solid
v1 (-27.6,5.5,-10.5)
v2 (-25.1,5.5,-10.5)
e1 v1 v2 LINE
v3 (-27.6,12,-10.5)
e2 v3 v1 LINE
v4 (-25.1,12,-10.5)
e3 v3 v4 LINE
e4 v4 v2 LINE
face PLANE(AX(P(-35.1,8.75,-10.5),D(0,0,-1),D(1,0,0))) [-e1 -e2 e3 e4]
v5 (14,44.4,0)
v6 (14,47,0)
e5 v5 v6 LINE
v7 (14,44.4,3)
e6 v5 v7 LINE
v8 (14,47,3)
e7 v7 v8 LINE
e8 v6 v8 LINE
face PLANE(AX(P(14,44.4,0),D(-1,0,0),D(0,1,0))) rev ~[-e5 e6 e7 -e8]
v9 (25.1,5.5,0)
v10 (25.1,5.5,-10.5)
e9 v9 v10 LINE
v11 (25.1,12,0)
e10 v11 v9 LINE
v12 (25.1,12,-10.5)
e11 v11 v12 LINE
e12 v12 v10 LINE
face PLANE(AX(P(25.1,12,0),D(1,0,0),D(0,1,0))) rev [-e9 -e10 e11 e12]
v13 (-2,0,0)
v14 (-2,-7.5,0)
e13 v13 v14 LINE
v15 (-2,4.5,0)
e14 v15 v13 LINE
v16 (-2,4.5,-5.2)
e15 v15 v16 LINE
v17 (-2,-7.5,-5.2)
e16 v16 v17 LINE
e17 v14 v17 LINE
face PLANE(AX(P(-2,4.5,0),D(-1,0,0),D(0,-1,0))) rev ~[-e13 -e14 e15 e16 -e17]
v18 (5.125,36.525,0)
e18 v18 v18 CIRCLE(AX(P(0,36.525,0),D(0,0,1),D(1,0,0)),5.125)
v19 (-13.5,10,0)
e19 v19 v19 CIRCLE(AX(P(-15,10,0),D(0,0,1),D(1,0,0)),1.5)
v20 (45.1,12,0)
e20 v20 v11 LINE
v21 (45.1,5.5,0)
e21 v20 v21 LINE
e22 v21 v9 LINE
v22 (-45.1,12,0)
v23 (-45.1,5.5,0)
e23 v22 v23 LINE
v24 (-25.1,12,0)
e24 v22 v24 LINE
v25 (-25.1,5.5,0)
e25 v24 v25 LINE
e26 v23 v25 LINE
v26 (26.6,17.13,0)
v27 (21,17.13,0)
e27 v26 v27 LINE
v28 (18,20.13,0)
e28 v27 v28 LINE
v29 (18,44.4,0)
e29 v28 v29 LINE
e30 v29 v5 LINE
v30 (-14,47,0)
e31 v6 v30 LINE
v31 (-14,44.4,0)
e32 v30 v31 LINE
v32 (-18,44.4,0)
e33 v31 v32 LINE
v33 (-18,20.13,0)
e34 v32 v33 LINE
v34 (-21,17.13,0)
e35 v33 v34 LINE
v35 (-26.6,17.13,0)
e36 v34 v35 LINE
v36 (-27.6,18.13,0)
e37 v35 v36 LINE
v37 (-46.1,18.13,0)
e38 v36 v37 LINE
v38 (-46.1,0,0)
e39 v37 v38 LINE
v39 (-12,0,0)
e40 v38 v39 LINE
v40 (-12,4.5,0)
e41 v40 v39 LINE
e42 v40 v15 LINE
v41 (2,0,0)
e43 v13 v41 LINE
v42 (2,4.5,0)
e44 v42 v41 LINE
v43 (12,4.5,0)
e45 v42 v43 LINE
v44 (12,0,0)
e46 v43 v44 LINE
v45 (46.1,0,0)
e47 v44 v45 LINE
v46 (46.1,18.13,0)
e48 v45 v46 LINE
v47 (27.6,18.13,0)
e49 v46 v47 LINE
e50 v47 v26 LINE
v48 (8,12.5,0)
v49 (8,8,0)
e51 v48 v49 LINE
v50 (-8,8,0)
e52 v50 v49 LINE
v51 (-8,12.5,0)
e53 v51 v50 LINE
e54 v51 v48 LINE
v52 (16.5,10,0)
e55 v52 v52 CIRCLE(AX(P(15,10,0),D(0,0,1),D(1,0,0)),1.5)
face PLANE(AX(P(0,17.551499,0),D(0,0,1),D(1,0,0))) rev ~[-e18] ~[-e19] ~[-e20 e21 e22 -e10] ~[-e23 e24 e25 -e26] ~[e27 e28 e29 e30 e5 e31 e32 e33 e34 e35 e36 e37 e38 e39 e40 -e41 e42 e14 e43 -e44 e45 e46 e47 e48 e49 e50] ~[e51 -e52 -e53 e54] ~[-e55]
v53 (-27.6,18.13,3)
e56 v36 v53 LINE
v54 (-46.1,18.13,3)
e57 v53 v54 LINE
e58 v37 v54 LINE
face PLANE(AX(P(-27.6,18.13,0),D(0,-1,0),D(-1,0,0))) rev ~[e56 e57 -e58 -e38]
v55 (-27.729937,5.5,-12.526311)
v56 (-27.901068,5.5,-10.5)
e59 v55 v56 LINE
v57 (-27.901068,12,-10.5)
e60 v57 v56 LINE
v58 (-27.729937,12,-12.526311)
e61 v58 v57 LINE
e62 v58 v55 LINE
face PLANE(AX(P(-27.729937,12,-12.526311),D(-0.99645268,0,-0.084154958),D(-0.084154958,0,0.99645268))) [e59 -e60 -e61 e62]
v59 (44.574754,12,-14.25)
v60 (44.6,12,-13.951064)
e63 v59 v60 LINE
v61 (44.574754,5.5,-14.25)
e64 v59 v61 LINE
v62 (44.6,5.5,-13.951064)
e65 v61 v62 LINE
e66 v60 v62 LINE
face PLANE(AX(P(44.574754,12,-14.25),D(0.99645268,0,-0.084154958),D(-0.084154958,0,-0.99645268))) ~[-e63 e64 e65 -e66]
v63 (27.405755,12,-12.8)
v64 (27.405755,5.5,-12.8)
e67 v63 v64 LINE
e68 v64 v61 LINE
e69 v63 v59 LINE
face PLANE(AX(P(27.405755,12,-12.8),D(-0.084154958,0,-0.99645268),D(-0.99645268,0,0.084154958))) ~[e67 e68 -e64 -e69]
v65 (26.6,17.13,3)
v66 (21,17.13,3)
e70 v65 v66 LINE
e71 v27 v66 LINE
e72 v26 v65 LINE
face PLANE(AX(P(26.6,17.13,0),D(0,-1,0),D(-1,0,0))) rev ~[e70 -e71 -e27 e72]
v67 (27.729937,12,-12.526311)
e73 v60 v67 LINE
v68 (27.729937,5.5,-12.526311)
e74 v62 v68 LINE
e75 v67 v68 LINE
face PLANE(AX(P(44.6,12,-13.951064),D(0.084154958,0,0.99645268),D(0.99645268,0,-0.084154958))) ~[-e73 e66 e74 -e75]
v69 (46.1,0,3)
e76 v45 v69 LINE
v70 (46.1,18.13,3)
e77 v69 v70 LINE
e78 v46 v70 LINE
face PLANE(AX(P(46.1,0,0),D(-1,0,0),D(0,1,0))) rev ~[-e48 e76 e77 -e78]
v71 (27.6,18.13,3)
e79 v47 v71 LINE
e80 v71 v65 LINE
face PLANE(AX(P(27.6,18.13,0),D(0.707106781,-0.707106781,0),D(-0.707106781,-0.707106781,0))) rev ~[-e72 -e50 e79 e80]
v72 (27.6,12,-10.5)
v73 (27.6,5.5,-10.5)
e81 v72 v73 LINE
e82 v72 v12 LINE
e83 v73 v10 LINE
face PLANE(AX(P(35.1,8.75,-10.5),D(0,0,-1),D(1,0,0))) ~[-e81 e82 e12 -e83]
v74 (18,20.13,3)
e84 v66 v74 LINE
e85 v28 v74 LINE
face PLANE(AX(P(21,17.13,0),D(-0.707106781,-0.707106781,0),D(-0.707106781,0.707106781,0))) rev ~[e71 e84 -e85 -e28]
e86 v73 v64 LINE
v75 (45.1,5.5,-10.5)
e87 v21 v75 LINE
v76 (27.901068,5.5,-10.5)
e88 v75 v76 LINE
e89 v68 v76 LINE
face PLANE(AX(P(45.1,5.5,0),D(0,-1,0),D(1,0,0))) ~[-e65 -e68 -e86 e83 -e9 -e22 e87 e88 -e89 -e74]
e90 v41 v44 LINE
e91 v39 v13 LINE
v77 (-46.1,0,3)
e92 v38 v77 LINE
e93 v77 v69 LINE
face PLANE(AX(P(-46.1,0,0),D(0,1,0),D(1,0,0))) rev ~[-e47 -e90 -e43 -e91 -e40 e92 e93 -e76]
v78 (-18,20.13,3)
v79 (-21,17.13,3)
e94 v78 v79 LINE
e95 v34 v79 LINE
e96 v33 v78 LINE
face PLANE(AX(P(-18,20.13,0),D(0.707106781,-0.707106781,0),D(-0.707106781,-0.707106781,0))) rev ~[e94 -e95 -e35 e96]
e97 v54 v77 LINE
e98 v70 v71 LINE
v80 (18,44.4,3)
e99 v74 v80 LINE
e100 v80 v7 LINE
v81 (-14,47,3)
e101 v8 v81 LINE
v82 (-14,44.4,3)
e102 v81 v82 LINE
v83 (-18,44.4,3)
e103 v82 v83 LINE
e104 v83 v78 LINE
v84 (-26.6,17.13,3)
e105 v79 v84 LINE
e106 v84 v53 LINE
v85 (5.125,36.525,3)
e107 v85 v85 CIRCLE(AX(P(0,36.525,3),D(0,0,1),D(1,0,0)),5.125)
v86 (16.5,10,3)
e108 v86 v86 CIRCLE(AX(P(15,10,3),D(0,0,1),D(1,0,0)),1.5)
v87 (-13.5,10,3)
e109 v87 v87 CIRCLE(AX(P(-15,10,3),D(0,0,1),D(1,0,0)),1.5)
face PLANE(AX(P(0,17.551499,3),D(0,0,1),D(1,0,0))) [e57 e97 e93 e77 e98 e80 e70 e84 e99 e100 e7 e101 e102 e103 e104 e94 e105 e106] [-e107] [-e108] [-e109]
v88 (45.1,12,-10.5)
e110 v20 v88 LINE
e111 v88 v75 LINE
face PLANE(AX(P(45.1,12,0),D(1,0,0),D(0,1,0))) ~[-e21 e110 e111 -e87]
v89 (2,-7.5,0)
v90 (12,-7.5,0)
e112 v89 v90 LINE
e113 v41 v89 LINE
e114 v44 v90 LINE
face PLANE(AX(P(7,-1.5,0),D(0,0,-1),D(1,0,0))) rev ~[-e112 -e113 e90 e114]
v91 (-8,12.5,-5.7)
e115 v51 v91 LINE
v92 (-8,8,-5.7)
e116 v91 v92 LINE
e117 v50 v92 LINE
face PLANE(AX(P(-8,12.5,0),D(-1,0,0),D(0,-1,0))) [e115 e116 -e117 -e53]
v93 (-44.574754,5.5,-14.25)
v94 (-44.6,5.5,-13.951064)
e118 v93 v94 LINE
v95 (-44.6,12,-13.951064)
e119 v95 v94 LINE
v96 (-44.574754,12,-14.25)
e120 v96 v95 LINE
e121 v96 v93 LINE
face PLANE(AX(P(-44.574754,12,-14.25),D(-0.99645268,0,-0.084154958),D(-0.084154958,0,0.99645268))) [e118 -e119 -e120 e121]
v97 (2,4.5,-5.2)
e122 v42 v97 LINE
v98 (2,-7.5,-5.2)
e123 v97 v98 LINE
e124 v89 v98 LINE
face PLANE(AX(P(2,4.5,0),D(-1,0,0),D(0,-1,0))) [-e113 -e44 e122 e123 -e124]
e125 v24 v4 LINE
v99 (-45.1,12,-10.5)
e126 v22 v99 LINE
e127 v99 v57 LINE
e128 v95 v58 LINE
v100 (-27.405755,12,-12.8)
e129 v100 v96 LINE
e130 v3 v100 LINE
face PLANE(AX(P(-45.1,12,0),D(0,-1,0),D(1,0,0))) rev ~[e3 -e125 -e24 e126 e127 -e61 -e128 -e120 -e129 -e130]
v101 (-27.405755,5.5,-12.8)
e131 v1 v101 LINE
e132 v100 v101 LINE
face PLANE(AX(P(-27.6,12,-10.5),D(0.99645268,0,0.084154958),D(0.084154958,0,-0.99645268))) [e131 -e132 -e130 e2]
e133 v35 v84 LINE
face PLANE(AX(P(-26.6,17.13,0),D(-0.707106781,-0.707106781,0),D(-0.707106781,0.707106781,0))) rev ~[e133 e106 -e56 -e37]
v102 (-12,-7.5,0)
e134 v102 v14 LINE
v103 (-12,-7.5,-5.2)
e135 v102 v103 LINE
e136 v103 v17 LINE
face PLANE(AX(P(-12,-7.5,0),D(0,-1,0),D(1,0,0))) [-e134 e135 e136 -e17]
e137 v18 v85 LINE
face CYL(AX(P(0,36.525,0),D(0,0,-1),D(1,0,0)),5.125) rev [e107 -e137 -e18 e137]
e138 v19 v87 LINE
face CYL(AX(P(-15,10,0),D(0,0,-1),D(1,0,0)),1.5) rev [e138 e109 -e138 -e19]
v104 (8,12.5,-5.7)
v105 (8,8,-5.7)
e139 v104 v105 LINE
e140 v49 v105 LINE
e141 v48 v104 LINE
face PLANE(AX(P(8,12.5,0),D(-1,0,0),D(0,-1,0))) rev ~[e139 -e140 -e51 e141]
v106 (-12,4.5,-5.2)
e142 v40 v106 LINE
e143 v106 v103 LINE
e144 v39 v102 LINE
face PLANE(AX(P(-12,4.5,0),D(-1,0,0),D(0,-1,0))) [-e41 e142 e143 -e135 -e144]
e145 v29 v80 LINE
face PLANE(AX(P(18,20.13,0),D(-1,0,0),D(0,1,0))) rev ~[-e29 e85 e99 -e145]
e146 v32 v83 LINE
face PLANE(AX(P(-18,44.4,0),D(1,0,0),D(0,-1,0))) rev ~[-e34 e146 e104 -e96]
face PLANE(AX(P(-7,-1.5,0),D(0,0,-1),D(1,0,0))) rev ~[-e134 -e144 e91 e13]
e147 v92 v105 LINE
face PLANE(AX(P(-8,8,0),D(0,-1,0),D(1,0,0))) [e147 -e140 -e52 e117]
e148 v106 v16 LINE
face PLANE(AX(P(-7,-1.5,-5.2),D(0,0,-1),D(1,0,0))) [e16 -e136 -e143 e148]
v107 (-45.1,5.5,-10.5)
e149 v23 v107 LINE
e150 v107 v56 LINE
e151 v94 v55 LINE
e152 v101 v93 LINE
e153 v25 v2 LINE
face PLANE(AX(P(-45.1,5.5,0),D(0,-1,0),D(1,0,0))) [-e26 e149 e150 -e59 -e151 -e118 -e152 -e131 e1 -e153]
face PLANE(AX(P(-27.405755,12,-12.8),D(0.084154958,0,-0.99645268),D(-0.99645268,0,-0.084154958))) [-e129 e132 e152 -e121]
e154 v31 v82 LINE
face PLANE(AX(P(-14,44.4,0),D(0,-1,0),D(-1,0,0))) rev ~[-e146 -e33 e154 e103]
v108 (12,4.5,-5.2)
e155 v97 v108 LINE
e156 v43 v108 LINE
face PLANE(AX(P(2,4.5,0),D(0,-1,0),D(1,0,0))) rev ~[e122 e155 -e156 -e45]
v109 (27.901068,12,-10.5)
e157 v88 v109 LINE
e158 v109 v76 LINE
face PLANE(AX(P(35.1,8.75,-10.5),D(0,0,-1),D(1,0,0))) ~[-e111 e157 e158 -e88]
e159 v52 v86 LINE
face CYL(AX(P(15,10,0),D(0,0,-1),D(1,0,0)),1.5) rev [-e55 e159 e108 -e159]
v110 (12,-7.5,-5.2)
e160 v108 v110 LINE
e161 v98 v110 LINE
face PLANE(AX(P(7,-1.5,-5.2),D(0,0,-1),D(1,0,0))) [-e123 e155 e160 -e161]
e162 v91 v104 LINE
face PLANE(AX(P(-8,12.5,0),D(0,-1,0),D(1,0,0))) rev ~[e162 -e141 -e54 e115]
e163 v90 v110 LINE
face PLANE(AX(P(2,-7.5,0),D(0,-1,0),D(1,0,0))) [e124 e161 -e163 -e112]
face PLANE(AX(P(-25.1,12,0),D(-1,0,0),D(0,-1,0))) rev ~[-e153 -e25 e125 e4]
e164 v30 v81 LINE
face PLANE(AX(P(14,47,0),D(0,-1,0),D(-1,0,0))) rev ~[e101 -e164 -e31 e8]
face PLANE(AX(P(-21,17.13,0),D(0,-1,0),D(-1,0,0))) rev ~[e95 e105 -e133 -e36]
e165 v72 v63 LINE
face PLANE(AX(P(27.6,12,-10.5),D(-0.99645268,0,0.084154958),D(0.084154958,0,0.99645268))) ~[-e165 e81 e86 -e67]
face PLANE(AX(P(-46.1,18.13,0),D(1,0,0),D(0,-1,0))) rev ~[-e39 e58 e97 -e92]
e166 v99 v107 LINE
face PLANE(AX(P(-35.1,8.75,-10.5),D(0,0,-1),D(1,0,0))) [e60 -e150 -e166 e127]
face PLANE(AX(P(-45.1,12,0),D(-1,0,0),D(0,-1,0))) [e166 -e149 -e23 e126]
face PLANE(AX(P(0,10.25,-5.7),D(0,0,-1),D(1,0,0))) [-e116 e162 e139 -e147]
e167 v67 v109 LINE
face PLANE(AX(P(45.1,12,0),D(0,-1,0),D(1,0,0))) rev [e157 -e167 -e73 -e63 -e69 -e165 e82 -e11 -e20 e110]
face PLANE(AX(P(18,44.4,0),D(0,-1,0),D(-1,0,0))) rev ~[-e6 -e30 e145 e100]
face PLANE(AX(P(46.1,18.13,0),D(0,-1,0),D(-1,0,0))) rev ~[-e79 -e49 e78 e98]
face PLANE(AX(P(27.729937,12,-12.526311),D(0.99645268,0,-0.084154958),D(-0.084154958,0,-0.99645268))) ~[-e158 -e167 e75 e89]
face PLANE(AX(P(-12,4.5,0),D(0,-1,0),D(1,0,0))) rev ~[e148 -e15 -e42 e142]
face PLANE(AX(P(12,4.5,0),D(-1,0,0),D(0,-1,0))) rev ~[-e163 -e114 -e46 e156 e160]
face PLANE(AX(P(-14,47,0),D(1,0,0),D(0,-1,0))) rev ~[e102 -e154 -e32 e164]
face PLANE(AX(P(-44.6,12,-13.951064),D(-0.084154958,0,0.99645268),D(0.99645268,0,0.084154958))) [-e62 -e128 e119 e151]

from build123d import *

# Parameters (mm, degrees)
F0_R     = 1.5
F0_R_2   = 5.125
F1_DEPTH = 3
F2_W     = 20
F2_H     = 6.5
F3_DEPTH = 10.5
F5_DEPTH = 6.5
F6_W     = 16
F6_H     = 4.5
F7_DEPTH = 5.7
F8_W     = 10
F8_H     = 12
F9_DEPTH = 5.2


# Not quite as in the source:
# - a pattern or mirror of a feature is missing from the dataset's text; its kind, count and spacing are read off the source's solid


with BuildPart() as f1:
    # F0 (on Top) → F1 (new body)
    with BuildSketch(Plane.XY):
        Polygon((-46.1, 18.13), (-46.1, 0), (46.1, 0), (46.1, 18.13), (27.6, 18.13), (26.6, 17.13), (21, 17.13), (18, 20.13), (18, 44.4), (14, 44.4), (14, 47), (-14, 47), (-14, 44.4), (-18, 44.4), (-18, 20.13), (-21, 17.13), (-26.6, 17.13), (-27.6, 18.13), align=None)
        with Locations((-15, 10)):
            Circle(F0_R, mode=Mode.SUBTRACT)
        with Locations((15, 10)):
            Circle(F0_R, mode=Mode.SUBTRACT)
        with Locations((0, 36.525)):
            Circle(F0_R_2, mode=Mode.SUBTRACT)
    extrude(amount=F1_DEPTH)

    # F2 (on face) → F3 (join)
    with BuildSketch(Plane(origin=(0, 0, 0), x_dir=(1, 0, 0), z_dir=(0, 0, -1))):
        with Locations((-35.1, -8.75)):
            Rectangle(F2_W, F2_H)
    f3 = extrude(amount=F3_DEPTH)

    # F3_copies: F3 across plane
    add(f3.mirror(Plane(origin=(0, 0, 0), x_dir=(0, 0, 1), z_dir=(1, 0, 0))))

    # F4 (on face) → F5 (join, through all)
    with BuildSketch(Plane(origin=(0, 12, 0), x_dir=(-1, 0, 0), z_dir=(0, 1, 0))):
        Polygon((44.5747535126, -14.25), (44.6, -13.9510641961), (27.7299368373, -12.5263106834), (27.9010679845, -10.5), (27.6, -10.5), (27.4057545459, -12.8), align=None)
    f5 = extrude(amount=-F5_DEPTH)

    # F5_copies: F5 across plane
    add(f5.mirror(Plane(origin=(0, 0, 0), x_dir=(0, 0, 1), z_dir=(1, 0, 0))))

    # F6 (on face) → F7 (join)
    with BuildSketch(Plane(origin=(0, 0, 0), x_dir=(1, 0, 0), z_dir=(0, 0, -1))):
        with Locations((0, -10.25)):
            Rectangle(F6_W, F6_H)
    extrude(amount=F7_DEPTH)

    # F8 (on face) → F9 (join)
    with BuildSketch(Plane(origin=(0, 0, 0), x_dir=(1, 0, 0), z_dir=(0, 0, -1))):
        with Locations((-7, 1.5)):
            Rectangle(F8_W, F8_H)
        with Locations((7, 1.5)):
            Rectangle(F8_W, F8_H)
    extrude(amount=F9_DEPTH)


solid = f1.part
